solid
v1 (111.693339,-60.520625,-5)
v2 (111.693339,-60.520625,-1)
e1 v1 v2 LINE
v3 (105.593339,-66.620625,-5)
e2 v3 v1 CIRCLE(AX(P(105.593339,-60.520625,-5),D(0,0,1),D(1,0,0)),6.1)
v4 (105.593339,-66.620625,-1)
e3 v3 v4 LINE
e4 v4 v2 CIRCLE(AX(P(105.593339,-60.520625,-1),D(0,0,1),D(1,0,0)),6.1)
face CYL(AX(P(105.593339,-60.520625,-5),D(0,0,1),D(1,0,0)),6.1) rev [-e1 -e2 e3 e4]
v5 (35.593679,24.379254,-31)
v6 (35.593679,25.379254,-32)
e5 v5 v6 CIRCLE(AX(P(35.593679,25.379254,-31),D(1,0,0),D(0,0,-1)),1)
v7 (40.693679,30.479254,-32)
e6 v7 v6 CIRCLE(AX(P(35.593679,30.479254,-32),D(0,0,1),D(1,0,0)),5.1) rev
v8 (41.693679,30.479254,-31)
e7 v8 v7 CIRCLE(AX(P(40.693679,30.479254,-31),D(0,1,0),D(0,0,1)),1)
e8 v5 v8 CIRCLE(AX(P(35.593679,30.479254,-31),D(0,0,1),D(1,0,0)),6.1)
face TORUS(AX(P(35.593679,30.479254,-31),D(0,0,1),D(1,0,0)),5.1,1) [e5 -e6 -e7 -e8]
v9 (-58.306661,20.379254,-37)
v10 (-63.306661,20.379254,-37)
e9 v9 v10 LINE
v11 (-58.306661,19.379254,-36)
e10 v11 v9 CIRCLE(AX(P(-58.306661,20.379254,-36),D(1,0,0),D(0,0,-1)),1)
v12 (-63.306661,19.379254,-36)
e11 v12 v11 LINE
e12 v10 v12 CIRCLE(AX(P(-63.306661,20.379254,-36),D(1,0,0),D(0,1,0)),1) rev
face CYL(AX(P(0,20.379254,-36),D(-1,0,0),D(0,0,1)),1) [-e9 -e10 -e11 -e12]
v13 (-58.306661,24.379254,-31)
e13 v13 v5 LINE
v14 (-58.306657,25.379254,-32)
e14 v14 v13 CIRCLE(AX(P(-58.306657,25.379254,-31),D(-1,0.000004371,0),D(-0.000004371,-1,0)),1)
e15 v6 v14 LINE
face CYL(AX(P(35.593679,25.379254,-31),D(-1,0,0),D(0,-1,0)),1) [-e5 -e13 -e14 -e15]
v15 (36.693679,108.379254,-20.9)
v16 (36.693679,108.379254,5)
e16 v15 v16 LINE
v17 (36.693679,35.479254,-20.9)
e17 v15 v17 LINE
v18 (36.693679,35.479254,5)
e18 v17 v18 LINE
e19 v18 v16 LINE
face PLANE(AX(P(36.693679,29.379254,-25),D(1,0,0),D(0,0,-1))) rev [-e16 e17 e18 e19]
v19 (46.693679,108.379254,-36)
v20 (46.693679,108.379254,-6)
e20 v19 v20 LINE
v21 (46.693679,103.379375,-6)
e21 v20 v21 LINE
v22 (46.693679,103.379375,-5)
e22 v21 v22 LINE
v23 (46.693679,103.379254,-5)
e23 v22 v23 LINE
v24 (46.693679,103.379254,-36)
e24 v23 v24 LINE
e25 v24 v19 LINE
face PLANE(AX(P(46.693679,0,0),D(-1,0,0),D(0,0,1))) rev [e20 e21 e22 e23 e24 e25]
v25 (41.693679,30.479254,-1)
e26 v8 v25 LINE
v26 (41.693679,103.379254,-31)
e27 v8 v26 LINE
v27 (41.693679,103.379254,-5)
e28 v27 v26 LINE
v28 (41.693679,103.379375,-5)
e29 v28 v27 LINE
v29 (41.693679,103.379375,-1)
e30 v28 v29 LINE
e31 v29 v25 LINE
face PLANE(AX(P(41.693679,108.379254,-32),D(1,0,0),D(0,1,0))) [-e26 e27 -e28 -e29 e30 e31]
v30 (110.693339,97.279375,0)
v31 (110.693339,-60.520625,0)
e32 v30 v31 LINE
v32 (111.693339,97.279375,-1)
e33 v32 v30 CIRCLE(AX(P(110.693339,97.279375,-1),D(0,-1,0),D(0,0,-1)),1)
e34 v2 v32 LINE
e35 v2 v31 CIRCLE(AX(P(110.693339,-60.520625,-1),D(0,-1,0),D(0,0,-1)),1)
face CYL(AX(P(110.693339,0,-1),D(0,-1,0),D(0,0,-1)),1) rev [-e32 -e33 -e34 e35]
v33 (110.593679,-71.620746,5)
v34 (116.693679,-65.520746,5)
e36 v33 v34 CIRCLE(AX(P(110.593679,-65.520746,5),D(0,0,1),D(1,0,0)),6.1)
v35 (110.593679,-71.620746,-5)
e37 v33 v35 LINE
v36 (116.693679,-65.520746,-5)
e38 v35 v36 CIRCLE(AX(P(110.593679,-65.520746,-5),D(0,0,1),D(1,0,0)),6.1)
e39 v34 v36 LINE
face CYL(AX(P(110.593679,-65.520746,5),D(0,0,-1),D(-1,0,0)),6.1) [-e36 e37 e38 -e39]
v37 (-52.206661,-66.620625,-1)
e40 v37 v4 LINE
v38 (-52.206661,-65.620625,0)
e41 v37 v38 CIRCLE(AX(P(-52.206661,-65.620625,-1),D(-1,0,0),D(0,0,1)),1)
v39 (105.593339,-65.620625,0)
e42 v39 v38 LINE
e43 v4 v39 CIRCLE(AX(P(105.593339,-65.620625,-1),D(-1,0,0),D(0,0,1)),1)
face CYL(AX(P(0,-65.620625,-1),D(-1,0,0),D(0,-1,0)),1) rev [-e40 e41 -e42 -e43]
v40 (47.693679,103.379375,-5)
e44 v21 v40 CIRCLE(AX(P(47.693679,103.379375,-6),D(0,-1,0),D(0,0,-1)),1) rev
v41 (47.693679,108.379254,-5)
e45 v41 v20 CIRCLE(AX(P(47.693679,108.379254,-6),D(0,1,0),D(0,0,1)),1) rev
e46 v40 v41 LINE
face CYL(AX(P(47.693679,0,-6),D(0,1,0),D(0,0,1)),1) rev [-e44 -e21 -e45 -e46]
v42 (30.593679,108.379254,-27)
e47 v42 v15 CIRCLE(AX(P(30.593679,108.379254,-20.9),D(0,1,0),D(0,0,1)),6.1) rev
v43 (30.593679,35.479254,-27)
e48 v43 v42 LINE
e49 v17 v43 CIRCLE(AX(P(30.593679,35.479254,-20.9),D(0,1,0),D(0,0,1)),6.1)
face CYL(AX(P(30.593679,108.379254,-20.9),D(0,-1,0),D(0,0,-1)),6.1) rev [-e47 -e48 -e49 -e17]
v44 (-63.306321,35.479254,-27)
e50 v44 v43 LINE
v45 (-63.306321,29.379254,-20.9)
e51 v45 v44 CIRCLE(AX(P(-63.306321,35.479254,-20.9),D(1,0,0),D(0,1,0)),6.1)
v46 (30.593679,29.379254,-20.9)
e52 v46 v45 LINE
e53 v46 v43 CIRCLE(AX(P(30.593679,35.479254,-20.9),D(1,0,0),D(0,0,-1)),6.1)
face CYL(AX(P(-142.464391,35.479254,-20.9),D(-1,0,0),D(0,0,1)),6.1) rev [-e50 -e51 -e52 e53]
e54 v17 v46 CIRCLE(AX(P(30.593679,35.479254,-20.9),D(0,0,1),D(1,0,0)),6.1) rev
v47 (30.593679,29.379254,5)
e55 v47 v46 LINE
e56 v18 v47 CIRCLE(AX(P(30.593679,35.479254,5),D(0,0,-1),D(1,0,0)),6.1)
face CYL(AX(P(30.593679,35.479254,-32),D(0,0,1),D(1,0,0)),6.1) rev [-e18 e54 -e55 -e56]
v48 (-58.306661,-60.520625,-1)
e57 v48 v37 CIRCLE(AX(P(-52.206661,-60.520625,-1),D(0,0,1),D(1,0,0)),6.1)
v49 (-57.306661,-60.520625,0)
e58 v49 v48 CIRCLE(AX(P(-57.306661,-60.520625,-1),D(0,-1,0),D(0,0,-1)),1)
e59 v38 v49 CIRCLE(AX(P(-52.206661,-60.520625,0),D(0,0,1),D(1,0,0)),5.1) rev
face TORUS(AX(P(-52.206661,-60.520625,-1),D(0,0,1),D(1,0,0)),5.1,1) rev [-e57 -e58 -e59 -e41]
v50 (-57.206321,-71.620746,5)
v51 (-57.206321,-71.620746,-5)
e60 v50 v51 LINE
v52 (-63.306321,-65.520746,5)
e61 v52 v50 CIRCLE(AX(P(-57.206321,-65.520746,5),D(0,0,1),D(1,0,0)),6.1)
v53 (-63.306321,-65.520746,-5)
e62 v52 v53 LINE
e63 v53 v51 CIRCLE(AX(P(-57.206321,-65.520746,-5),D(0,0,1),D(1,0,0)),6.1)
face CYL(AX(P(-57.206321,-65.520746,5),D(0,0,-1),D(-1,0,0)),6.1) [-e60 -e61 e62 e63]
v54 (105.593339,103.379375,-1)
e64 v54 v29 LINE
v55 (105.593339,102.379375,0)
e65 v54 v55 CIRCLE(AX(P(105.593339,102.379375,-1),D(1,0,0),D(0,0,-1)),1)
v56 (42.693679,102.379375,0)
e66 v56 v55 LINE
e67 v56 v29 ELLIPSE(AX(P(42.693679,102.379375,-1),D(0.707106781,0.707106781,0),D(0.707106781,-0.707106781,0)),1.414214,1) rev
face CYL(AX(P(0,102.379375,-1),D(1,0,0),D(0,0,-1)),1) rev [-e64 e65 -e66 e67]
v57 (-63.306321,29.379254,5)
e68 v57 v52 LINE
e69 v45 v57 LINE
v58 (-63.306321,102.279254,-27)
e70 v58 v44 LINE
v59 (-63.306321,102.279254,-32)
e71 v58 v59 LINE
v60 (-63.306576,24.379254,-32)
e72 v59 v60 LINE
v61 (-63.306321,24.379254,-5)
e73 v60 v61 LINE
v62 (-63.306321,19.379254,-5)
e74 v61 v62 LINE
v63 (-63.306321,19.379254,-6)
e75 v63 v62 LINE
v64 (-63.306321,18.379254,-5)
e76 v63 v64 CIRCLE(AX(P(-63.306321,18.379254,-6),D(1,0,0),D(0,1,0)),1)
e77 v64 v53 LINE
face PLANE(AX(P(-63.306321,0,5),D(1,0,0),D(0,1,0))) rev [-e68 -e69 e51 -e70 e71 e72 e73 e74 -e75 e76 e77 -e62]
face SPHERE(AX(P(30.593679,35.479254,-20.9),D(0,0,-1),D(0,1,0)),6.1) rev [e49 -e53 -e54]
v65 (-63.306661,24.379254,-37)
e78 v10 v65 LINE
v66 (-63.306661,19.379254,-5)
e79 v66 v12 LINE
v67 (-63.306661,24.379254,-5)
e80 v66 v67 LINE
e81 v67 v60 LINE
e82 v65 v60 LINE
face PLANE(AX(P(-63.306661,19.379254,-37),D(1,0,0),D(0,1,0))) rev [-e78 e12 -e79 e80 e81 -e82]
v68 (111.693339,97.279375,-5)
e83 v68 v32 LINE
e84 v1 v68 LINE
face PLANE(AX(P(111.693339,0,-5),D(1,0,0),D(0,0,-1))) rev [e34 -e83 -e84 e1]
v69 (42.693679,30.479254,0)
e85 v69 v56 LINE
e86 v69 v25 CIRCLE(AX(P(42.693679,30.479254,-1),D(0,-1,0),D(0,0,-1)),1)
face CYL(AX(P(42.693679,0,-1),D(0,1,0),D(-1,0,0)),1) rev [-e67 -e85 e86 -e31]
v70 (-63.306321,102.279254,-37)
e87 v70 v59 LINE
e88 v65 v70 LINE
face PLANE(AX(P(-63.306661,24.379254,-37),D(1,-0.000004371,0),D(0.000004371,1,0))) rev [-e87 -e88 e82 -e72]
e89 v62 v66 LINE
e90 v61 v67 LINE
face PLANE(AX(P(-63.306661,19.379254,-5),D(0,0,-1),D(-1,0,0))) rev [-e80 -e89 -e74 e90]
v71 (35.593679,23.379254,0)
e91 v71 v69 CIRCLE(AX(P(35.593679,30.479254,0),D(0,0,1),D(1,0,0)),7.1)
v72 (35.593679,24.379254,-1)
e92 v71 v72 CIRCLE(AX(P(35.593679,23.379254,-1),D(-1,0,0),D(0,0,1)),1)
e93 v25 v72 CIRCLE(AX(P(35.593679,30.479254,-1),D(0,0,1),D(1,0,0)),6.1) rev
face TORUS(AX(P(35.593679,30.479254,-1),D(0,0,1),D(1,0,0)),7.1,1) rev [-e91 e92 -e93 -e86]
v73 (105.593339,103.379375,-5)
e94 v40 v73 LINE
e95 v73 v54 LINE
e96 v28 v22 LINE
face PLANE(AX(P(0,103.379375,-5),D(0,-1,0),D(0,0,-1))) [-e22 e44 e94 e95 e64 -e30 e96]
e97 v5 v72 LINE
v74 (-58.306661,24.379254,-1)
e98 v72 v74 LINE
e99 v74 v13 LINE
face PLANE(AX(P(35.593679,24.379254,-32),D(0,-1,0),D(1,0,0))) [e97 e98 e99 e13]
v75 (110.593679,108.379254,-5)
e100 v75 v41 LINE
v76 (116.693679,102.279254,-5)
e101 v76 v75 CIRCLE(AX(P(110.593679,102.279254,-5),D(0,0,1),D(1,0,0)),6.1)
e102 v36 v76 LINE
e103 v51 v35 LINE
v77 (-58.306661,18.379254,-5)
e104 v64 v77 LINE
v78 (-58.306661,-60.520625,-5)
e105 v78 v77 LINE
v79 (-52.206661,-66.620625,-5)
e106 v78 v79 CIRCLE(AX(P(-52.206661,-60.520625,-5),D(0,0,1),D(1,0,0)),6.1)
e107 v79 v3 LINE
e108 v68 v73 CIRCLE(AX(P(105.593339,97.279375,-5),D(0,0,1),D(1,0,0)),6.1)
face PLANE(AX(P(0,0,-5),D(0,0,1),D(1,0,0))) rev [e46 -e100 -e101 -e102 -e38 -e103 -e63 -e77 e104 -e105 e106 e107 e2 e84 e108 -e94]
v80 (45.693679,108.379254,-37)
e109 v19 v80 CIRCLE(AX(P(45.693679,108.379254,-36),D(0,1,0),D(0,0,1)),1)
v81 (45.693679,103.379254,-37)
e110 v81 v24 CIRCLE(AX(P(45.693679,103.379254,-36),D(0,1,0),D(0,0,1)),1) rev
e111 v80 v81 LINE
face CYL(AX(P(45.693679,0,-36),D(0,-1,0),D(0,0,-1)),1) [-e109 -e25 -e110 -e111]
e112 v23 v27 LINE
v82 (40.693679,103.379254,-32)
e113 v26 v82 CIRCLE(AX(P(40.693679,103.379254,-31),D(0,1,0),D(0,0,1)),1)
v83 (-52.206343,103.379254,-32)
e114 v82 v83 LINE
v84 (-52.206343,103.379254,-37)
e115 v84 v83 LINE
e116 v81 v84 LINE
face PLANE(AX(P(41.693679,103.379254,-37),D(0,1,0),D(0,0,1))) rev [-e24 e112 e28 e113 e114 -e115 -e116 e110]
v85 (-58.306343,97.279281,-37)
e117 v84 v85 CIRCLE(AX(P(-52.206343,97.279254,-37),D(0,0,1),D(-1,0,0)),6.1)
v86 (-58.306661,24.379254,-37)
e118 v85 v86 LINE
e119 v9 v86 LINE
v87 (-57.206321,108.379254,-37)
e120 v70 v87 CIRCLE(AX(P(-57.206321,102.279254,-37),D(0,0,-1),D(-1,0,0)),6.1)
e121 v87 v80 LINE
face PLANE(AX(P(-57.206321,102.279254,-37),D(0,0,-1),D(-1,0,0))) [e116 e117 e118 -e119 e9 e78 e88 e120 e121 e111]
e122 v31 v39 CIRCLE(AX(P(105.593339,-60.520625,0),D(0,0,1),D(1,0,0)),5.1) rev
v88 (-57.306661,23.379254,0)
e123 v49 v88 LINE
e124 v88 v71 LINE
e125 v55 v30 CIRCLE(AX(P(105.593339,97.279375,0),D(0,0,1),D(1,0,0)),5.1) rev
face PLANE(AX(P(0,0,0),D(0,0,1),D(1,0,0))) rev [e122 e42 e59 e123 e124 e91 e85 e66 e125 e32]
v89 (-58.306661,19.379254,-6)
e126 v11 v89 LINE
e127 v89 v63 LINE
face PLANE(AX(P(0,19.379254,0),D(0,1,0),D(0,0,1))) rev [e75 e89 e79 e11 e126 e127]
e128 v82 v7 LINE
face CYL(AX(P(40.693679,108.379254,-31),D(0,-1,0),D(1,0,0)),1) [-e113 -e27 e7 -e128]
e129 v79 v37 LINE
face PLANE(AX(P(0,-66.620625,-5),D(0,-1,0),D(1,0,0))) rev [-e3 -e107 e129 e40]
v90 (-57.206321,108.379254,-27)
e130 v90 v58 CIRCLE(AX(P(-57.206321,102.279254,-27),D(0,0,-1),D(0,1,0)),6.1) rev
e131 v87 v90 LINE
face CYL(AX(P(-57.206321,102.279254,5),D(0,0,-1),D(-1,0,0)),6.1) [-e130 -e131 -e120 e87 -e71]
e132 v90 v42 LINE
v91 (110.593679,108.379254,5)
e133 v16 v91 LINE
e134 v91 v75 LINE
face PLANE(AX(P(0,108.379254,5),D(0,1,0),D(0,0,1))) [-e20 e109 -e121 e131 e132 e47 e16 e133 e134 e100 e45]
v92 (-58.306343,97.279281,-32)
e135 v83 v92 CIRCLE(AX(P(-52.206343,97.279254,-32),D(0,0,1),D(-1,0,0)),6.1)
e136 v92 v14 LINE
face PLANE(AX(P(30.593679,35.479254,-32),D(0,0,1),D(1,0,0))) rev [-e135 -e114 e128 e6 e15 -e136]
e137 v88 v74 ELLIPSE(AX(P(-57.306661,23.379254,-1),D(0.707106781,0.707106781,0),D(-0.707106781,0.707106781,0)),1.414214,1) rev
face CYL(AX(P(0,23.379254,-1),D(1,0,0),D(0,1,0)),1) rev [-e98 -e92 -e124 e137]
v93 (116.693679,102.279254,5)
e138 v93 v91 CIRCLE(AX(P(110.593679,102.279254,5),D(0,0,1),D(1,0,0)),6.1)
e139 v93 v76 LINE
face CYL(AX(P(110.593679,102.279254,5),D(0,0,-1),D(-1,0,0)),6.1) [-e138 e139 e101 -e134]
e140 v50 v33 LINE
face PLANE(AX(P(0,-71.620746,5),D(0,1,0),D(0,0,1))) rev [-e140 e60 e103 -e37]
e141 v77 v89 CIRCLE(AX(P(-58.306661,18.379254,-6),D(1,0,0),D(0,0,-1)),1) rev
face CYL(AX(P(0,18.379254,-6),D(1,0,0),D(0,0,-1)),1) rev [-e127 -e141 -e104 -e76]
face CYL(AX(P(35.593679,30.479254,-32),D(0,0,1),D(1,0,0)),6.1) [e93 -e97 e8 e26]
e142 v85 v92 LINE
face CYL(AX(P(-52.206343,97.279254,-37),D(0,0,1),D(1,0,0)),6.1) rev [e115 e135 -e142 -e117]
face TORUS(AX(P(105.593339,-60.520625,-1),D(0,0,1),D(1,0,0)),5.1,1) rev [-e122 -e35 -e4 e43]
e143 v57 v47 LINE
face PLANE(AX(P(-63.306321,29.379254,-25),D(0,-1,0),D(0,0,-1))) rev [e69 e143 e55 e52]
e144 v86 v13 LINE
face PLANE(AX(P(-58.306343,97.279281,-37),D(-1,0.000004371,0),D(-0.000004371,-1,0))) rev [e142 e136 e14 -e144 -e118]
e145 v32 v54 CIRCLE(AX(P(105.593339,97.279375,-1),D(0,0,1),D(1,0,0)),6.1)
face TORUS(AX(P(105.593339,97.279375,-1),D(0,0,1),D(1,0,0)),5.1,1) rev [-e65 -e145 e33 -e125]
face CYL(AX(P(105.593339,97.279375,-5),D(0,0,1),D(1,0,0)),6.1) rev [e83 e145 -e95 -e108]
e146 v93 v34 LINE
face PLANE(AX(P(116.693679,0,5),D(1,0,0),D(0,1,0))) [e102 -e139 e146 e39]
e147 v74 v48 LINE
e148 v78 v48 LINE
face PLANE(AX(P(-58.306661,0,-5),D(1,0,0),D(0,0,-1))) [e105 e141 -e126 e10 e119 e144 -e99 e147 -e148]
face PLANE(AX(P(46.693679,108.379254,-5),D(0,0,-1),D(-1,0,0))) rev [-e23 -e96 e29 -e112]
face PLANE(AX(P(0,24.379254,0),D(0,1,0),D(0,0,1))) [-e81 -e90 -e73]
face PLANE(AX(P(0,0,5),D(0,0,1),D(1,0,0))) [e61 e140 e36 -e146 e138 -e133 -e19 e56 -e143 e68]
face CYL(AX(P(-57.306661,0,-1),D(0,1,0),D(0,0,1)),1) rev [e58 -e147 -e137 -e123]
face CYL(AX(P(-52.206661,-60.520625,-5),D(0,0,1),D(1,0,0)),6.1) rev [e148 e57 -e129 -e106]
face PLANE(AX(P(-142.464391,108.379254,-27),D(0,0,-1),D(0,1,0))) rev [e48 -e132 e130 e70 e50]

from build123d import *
from build123d.topology import SkipClean

# Parameters (mm, degrees)
BOSS_EXTRUDE1_DEPTH = 5
BOSS_EXTRUDE2_START = -10
BOSS_EXTRUDE2_DEPTH = 10
SKETCH4_W           = 100
SKETCH4_H           = 79
CUT_EXTRUDE1_DEPTH  = 30
BOSS_EXTRUDE3_DEPTH = 37
SKETCH8_W           = 5
SKETCH8_H           = 79
BOSS_EXTRUDE6_DEPTH = 100
FILLET3_R           = 6.1
FILLET4_R           = 6.1
BOSS_EXTRUDE7_DEPTH = 5
SKETCH10_W          = 5
SKETCH10_H          = 32
BOSS_EXTRUDE8_DEPTH = 5
SKETCH11_W          = 32
SKETCH11_H          = 5
BOSS_EXTRUDE9_DEPTH = 5
FILLET6_R           = 1


with BuildPart() as part:
    # Sketch1 → Boss-Extrude1 (new body)
    with BuildSketch(Plane.XY):
        with BuildLine():
            Line((-57.206320908, 108.379254457), (110.593679092, 108.379254457))
            ThreePointArc((110.593679092, 108.379254457), (114.907030458, 106.592605822), (116.693679092, 102.279254457))
            Line((116.693679092, 102.279254457), (116.693679092, -65.520745543))
            ThreePointArc((116.693679092, -65.520745543), (114.907030458, -69.834096908), (110.593679092, -71.620745543))
            Line((110.593679092, -71.620745543), (-57.206320908, -71.620745543))
            ThreePointArc((-57.206320908, -71.620745543), (-61.519672273, -69.834096908), (-63.306320908, -65.520745543))
            Line((-63.306320908, -65.520745543), (-63.306320908, 102.279254457))
            ThreePointArc((-63.306320908, 102.279254457), (-61.519672273, 106.592605822), (-57.206320908, 108.379254457))
        make_face()
    extrude(amount=BOSS_EXTRUDE1_DEPTH)

    # Sketch3 → Boss-Extrude2 (add)
    with SkipClean():  # the faces are left unmerged after this step: merging them gives an invalid solid
        with BuildSketch(Plane.XY.offset(5).offset(BOSS_EXTRUDE2_START)):
            with BuildLine():
                ThreePointArc((-57.206320908, 108.379254457), (-61.519672273, 106.592605822), (-63.306320908, 102.279254457))
                Line((-63.306320908, 102.279254457), (-63.306320908, -65.520745543))
                ThreePointArc((-63.306320908, -65.520745543), (-61.519672273, -69.834096908), (-57.206320908, -71.620745543))
                Line((-57.206320908, -71.620745543), (110.593679092, -71.620745543))
                ThreePointArc((110.593679092, -71.620745543), (114.907030458, -69.834096908), (116.693679092, -65.520745543))
                Line((116.693679092, -65.520745543), (116.693679092, 102.279254457))
                ThreePointArc((116.693679092, 102.279254457), (114.907030458, 106.592605822), (110.593679092, 108.379254457))
                Line((110.593679092, 108.379254457), (-57.206320908, 108.379254457))
            make_face()
            with BuildLine():
                Line((105.593338585, -66.620625471), (-52.206661415, -66.620625471))
                ThreePointArc((-52.206661415, -66.620625471), (-56.520012781, -64.833976836), (-58.306661415, -60.520625471))
                Line((-58.306661415, -60.520625471), (-58.306661415, 97.279374529))
                ThreePointArc((-58.306661415, 97.279374529), (-56.520012781, 101.592725894), (-52.206661415, 103.379374529))
                Line((-52.206661415, 103.379374529), (105.593338585, 103.379374529))
                ThreePointArc((105.593338585, 103.379374529), (109.90668995, 101.592725894), (111.693338585, 97.279374529))
                Line((111.693338585, 97.279374529), (111.693338585, -60.520625471))
                ThreePointArc((111.693338585, -60.520625471), (109.90668995, -64.833976836), (105.593338585, -66.620625471))
            make_face(mode=Mode.SUBTRACT)
        extrude(amount=BOSS_EXTRUDE2_DEPTH)
    add(part.part.scale(1), mode=Mode.REPLACE)  # the faces are merged on a copy

    # Sketch4 → Cut-Extrude1 (cut, symmetric)
    with BuildSketch(Plane.XY.offset(5)):
        with Locations((-13.306320908, 68.879254457)):
            Rectangle(SKETCH4_W, SKETCH4_H)
    extrude(amount=CUT_EXTRUDE1_DEPTH, both=True, mode=Mode.SUBTRACT)

    # Sketch5 → Boss-Extrude3 (add)
    with BuildSketch(Plane.XY.offset(5)):
        with BuildLine():
            Line((36.693679092, 108.379254457), (41.693679092, 108.379254457))
            Line((41.693679092, 108.379254457), (41.693679092, 30.479254457))
            ThreePointArc((41.693679092, 30.479254457), (39.907030458, 26.165903092), (35.593679092, 24.379254457))
            Line((35.593679092, 24.379254457), (-63.306320908, 24.379254457))
            Line((-63.306320908, 24.379254457), (-63.306320908, 29.379254457))
            Line((-63.306320908, 29.379254457), (30.593679092, 29.379254457))
            ThreePointArc((30.593679092, 29.379254457), (34.907030458, 31.165903092), (36.693679092, 35.479254457))
            Line((36.693679092, 35.479254457), (36.693679092, 108.379254457))
        make_face()
    extrude(amount=-BOSS_EXTRUDE3_DEPTH)

    # Sketch8 → Boss-Extrude6 (add)
    with BuildSketch(Plane.ZY.offset(-36.693679092)):
        with Locations((-29.5, 68.879254457)):
            Rectangle(SKETCH8_W, SKETCH8_H)
    extrude(amount=BOSS_EXTRUDE6_DEPTH)

    # Fillet3
    fillet3_edges = [part.edges().sort_by_distance(p)[0] for p in [
        (-63.306320908, 108.379254457, -29.5),
    ]]
    fillet(fillet3_edges, radius=FILLET3_R)

    # Fillet4
    fillet4_edges = [part.edges().sort_by_distance(p)[0] for p in [
        (34.907030458, 31.165903092, -27),
        (36.693679092, 71.929254457, -27),
        (-16.356320908, 29.379254457, -27),
    ]]
    fillet(fillet4_edges, radius=FILLET4_R)

    # Sketch9 → Boss-Extrude7 (add)
    with BuildSketch(Plane(origin=(0, 0, -32), x_dir=(-1, 0, 0), z_dir=(0, 0, -1))):
        with BuildLine():
            Line((-41.693679092, 103.379254457), (52.206342763, 103.379254457))
            ThreePointArc((52.206342763, 103.379254457), (56.519684701, 101.592615249), (58.306342763, 97.279281121))
            Line((58.306342763, 97.279281121), (58.306661415, 24.379254457))
            Line((58.306661415, 24.379254457), (63.306661415, 24.379254457))
            Line((63.306661415, 24.379254457), (63.306320908, 102.279254457))
            ThreePointArc((63.306320908, 102.279254457), (61.519672273, 106.592605822), (57.206320908, 108.379254457))
            Line((57.206320908, 108.379254457), (-41.693679092, 108.379254457))
            Line((-41.693679092, 108.379254457), (-41.693679092, 103.379254457))
        make_face()
    extrude(amount=BOSS_EXTRUDE7_DEPTH)

    # Sketch10 → Boss-Extrude8 (add)
    with BuildSketch(Plane.XZ.offset(-24.379254457)):
        with Locations((-60.806661415, -21)):
            Rectangle(SKETCH10_W, SKETCH10_H)
    extrude(amount=BOSS_EXTRUDE8_DEPTH)

    # Sketch11 → Boss-Extrude9 (add)
    with BuildSketch(Plane(origin=(41.693679092, 0, 0), x_dir=(0, 0, -1), z_dir=(1, 0, 0))):
        with Locations((21, 105.879254457)):
            Rectangle(SKETCH11_W, SKETCH11_H)
    extrude(amount=BOSS_EXTRUDE9_DEPTH)

    # Fillet6
    fillet6_edges = [part.edges().sort_by_distance(p)[0] for p in [
        (73.643508838, 103.379374529, 0),
        (-11.356491162, 24.379254457, 0),
        (39.907030458, 26.165903092, 0),
        (41.693679092, 66.929314493, 0),
        (41.693679092, 66.929254457, -32),
        (39.907030458, 26.165903092, -32),
        (-11.356491162, 24.379254457, -32),
        (-60.806661415, 19.379254457, -37),
        (-60.806491162, 19.379254457, -5),
        (-58.306661415, -18.070685507, 0),
        (46.693679092, 105.879254457, -37),
        (46.693679092, 105.879314493, -5),
        (109.90668995, 101.592725894, 0),
        (111.693338585, 18.379374529, 0),
        (109.90668995, -64.833976836, 0),
        (26.693338585, -66.620625471, 0),
        (-56.520012781, -64.833976836, 0),
    ]]
    fillet(fillet6_edges, radius=FILLET6_R)


solid = part.part
